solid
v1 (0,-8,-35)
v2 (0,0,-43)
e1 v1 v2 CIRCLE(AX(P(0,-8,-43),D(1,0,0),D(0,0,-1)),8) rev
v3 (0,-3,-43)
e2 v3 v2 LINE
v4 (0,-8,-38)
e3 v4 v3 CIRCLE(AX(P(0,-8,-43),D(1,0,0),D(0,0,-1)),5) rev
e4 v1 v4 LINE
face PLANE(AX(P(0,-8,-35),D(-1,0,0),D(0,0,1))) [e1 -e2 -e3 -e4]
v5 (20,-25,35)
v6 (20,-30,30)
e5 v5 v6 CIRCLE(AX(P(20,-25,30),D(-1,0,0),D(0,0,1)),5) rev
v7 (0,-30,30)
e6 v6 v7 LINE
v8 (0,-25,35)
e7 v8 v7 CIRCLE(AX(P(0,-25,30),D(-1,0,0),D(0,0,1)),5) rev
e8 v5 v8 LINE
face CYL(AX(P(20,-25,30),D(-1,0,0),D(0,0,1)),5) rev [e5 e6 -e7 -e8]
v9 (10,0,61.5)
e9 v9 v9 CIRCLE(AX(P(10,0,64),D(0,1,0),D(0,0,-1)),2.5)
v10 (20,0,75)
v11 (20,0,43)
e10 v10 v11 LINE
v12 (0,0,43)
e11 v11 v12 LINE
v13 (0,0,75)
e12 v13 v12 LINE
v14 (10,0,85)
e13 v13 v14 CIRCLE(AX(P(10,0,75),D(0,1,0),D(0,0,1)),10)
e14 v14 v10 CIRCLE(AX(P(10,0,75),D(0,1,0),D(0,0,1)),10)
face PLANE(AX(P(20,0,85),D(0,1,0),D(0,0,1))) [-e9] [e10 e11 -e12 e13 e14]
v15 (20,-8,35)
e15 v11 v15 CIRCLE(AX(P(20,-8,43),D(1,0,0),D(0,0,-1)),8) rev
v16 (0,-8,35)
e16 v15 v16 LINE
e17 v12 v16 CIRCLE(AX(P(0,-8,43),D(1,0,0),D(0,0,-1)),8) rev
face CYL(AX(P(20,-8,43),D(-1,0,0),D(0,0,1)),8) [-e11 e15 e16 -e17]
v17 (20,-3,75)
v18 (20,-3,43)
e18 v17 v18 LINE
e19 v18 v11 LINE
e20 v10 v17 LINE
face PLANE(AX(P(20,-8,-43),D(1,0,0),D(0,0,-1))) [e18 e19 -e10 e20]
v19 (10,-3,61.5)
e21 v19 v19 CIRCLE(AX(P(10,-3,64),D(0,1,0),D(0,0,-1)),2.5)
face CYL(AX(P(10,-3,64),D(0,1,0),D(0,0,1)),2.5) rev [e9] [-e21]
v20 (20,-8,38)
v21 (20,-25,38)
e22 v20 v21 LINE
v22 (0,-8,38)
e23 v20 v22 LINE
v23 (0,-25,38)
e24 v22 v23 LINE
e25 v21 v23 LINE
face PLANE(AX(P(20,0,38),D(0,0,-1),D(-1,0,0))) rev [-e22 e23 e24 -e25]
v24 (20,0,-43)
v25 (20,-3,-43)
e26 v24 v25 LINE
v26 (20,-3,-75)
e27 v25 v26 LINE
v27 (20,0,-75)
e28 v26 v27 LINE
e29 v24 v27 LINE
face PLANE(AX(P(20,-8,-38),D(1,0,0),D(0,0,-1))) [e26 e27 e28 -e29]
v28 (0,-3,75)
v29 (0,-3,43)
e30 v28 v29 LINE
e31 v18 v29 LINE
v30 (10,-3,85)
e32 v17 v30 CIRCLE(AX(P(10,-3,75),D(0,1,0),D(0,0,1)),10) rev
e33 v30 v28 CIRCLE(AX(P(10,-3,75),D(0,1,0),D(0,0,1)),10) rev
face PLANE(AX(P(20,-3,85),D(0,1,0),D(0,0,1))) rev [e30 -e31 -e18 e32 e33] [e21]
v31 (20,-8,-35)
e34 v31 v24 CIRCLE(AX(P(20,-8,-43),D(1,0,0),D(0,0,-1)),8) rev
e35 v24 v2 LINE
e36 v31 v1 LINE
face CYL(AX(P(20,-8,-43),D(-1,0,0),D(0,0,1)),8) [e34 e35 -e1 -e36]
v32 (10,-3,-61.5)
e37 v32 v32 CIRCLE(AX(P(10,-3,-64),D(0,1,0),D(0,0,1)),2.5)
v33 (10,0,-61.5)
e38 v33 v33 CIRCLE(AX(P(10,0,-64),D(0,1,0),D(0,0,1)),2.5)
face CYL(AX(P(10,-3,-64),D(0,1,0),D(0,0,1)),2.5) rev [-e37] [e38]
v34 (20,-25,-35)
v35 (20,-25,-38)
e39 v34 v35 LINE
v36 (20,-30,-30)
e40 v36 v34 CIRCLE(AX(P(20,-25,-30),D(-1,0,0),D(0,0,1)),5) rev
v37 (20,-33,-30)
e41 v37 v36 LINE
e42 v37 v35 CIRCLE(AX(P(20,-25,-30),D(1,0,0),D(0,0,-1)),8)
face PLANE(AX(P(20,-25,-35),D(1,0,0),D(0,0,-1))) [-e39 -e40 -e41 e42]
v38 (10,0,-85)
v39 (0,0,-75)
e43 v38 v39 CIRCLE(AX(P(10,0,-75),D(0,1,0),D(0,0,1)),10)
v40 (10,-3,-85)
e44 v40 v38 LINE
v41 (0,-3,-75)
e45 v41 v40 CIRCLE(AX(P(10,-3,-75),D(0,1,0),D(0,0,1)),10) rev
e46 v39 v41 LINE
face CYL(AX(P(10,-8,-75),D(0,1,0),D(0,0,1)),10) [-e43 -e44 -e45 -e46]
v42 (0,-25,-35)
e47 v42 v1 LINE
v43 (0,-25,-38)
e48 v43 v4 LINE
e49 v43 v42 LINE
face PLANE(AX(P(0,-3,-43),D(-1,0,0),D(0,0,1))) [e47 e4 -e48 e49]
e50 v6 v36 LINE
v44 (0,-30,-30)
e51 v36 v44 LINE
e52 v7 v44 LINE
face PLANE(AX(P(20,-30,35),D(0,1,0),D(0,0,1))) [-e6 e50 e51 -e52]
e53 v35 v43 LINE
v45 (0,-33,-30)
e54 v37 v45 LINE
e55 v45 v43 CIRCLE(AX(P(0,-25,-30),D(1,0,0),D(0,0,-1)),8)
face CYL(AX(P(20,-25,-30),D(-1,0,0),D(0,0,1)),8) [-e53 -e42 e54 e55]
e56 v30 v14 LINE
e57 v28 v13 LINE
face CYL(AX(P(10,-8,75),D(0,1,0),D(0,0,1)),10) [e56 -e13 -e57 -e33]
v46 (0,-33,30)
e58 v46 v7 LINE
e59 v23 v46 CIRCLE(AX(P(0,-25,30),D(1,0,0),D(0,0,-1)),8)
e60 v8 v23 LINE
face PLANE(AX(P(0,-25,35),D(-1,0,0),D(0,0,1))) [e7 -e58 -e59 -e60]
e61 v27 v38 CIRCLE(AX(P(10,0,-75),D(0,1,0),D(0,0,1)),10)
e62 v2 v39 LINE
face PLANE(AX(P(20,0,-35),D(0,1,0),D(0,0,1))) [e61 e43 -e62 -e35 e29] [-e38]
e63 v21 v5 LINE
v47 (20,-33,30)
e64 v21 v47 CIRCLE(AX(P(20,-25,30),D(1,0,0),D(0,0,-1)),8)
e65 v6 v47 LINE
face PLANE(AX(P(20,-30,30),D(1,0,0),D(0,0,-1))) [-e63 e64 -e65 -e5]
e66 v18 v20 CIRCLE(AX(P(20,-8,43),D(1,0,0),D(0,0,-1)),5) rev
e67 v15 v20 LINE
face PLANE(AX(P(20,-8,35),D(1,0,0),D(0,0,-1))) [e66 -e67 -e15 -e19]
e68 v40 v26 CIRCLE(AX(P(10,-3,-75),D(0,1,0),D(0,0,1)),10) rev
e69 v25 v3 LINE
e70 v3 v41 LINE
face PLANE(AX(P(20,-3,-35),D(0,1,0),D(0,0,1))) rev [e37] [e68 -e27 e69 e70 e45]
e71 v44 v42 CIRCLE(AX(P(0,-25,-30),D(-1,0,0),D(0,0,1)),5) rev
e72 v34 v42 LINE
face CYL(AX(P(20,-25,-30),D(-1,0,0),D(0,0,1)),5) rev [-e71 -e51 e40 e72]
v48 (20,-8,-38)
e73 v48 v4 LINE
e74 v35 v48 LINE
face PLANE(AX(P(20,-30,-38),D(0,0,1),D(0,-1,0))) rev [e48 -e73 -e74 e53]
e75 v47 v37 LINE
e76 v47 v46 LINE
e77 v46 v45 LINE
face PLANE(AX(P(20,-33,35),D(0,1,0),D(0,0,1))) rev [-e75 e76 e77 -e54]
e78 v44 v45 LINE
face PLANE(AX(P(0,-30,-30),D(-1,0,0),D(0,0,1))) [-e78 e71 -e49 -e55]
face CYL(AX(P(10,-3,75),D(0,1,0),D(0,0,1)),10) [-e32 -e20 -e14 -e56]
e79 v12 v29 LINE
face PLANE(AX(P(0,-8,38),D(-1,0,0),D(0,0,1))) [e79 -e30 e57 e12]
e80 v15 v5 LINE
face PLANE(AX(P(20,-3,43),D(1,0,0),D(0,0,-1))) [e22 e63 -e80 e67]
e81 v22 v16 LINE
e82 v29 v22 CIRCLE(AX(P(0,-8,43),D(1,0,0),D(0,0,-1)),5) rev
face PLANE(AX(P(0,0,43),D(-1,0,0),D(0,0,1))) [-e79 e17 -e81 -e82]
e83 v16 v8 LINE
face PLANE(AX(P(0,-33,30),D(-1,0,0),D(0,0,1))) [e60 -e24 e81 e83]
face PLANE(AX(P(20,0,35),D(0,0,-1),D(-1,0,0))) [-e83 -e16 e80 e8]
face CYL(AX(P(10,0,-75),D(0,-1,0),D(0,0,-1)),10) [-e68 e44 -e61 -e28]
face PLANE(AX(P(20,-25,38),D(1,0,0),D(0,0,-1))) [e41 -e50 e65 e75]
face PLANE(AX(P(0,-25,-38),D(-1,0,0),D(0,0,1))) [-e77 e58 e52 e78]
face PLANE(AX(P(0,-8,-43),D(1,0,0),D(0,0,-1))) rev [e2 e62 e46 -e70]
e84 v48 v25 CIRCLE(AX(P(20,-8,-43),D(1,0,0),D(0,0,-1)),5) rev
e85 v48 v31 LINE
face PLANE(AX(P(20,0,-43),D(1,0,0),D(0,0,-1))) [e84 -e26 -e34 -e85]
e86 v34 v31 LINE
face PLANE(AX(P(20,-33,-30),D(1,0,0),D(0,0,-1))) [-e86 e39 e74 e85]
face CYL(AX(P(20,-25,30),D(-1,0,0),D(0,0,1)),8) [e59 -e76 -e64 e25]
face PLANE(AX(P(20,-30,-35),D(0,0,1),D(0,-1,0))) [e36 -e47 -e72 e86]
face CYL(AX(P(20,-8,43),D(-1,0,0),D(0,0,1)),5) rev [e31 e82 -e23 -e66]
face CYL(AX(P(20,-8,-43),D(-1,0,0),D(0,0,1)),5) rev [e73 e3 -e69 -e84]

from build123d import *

# Parameters (mm, degrees)
BASE_FLANGE1_DEPTH = 20
SKETCH6_R          = 2.5
CUT_EXTRUDE1_DEPTH = 10
FILLET1_R          = 10


# Sheet-metal steps are written as plain solids
with BuildPart() as part:
    # Sketch1 → Base-Flange1 (new body)
    with BuildSketch(Plane(origin=(0, 0, 0), x_dir=(0, 0, -1), z_dir=(1, 0, 0))):
        with BuildLine():
            Line((-85, 0), (-43, 0))
            ThreePointArc((-43, 0), (-37.343145751, -2.343145751), (-35, -8))
            Line((-35, -8), (-35, -25))
            ThreePointArc((-35, -25), (-33.535533906, -28.535533906), (-30, -30))
            Line((-30, -30), (30, -30))
            ThreePointArc((30, -30), (33.535533906, -28.535533906), (35, -25))
            Line((35, -25), (35, -8))
            ThreePointArc((35, -8), (37.343145751, -2.343145751), (43, 0))
            Line((43, 0), (85, 0))
            Line((85, 0), (85, -3))
            Line((85, -3), (43, -3))
            ThreePointArc((43, -3), (39.464466094, -4.464466094), (38, -8))
            Line((38, -8), (38, -25))
            ThreePointArc((38, -25), (35.656854249, -30.656854249), (30, -33))
            Line((30, -33), (-30, -33))
            ThreePointArc((-30, -33), (-35.656854249, -30.656854249), (-38, -25))
            Line((-38, -25), (-38, -8))
            ThreePointArc((-38, -8), (-39.464466094, -4.464466094), (-43, -3))
            Line((-43, -3), (-85, -3))
            Line((-85, -3), (-85, 0))
        make_face()
    extrude(amount=BASE_FLANGE1_DEPTH)

    # Sketch6 → Cut-Extrude1 (cut)
    with BuildSketch(Plane(origin=(0, 0, 0), x_dir=(1, 0, 0), z_dir=(0, 1, 0))):
        with Locations(Location((10, 64, 0), (0, 0, 270))):
            Circle(SKETCH6_R)
        with Locations(Location((10, -64, 0), (0, 0, 90))):
            Circle(SKETCH6_R)
    extrude(amount=-CUT_EXTRUDE1_DEPTH, mode=Mode.SUBTRACT)

    # Fillet1
    fillet1_edges = [part.edges().sort_by_distance(p)[0] for p in [
        (20, -1.5, -85),
        (0, -1.5, -85),
        (0, -1.5, 85),
        (20, -1.5, 85),
    ]]
    fillet(fillet1_edges, radius=FILLET1_R - 0.0001)  # a hair under: the kernel refuses the full size


solid = part.part
